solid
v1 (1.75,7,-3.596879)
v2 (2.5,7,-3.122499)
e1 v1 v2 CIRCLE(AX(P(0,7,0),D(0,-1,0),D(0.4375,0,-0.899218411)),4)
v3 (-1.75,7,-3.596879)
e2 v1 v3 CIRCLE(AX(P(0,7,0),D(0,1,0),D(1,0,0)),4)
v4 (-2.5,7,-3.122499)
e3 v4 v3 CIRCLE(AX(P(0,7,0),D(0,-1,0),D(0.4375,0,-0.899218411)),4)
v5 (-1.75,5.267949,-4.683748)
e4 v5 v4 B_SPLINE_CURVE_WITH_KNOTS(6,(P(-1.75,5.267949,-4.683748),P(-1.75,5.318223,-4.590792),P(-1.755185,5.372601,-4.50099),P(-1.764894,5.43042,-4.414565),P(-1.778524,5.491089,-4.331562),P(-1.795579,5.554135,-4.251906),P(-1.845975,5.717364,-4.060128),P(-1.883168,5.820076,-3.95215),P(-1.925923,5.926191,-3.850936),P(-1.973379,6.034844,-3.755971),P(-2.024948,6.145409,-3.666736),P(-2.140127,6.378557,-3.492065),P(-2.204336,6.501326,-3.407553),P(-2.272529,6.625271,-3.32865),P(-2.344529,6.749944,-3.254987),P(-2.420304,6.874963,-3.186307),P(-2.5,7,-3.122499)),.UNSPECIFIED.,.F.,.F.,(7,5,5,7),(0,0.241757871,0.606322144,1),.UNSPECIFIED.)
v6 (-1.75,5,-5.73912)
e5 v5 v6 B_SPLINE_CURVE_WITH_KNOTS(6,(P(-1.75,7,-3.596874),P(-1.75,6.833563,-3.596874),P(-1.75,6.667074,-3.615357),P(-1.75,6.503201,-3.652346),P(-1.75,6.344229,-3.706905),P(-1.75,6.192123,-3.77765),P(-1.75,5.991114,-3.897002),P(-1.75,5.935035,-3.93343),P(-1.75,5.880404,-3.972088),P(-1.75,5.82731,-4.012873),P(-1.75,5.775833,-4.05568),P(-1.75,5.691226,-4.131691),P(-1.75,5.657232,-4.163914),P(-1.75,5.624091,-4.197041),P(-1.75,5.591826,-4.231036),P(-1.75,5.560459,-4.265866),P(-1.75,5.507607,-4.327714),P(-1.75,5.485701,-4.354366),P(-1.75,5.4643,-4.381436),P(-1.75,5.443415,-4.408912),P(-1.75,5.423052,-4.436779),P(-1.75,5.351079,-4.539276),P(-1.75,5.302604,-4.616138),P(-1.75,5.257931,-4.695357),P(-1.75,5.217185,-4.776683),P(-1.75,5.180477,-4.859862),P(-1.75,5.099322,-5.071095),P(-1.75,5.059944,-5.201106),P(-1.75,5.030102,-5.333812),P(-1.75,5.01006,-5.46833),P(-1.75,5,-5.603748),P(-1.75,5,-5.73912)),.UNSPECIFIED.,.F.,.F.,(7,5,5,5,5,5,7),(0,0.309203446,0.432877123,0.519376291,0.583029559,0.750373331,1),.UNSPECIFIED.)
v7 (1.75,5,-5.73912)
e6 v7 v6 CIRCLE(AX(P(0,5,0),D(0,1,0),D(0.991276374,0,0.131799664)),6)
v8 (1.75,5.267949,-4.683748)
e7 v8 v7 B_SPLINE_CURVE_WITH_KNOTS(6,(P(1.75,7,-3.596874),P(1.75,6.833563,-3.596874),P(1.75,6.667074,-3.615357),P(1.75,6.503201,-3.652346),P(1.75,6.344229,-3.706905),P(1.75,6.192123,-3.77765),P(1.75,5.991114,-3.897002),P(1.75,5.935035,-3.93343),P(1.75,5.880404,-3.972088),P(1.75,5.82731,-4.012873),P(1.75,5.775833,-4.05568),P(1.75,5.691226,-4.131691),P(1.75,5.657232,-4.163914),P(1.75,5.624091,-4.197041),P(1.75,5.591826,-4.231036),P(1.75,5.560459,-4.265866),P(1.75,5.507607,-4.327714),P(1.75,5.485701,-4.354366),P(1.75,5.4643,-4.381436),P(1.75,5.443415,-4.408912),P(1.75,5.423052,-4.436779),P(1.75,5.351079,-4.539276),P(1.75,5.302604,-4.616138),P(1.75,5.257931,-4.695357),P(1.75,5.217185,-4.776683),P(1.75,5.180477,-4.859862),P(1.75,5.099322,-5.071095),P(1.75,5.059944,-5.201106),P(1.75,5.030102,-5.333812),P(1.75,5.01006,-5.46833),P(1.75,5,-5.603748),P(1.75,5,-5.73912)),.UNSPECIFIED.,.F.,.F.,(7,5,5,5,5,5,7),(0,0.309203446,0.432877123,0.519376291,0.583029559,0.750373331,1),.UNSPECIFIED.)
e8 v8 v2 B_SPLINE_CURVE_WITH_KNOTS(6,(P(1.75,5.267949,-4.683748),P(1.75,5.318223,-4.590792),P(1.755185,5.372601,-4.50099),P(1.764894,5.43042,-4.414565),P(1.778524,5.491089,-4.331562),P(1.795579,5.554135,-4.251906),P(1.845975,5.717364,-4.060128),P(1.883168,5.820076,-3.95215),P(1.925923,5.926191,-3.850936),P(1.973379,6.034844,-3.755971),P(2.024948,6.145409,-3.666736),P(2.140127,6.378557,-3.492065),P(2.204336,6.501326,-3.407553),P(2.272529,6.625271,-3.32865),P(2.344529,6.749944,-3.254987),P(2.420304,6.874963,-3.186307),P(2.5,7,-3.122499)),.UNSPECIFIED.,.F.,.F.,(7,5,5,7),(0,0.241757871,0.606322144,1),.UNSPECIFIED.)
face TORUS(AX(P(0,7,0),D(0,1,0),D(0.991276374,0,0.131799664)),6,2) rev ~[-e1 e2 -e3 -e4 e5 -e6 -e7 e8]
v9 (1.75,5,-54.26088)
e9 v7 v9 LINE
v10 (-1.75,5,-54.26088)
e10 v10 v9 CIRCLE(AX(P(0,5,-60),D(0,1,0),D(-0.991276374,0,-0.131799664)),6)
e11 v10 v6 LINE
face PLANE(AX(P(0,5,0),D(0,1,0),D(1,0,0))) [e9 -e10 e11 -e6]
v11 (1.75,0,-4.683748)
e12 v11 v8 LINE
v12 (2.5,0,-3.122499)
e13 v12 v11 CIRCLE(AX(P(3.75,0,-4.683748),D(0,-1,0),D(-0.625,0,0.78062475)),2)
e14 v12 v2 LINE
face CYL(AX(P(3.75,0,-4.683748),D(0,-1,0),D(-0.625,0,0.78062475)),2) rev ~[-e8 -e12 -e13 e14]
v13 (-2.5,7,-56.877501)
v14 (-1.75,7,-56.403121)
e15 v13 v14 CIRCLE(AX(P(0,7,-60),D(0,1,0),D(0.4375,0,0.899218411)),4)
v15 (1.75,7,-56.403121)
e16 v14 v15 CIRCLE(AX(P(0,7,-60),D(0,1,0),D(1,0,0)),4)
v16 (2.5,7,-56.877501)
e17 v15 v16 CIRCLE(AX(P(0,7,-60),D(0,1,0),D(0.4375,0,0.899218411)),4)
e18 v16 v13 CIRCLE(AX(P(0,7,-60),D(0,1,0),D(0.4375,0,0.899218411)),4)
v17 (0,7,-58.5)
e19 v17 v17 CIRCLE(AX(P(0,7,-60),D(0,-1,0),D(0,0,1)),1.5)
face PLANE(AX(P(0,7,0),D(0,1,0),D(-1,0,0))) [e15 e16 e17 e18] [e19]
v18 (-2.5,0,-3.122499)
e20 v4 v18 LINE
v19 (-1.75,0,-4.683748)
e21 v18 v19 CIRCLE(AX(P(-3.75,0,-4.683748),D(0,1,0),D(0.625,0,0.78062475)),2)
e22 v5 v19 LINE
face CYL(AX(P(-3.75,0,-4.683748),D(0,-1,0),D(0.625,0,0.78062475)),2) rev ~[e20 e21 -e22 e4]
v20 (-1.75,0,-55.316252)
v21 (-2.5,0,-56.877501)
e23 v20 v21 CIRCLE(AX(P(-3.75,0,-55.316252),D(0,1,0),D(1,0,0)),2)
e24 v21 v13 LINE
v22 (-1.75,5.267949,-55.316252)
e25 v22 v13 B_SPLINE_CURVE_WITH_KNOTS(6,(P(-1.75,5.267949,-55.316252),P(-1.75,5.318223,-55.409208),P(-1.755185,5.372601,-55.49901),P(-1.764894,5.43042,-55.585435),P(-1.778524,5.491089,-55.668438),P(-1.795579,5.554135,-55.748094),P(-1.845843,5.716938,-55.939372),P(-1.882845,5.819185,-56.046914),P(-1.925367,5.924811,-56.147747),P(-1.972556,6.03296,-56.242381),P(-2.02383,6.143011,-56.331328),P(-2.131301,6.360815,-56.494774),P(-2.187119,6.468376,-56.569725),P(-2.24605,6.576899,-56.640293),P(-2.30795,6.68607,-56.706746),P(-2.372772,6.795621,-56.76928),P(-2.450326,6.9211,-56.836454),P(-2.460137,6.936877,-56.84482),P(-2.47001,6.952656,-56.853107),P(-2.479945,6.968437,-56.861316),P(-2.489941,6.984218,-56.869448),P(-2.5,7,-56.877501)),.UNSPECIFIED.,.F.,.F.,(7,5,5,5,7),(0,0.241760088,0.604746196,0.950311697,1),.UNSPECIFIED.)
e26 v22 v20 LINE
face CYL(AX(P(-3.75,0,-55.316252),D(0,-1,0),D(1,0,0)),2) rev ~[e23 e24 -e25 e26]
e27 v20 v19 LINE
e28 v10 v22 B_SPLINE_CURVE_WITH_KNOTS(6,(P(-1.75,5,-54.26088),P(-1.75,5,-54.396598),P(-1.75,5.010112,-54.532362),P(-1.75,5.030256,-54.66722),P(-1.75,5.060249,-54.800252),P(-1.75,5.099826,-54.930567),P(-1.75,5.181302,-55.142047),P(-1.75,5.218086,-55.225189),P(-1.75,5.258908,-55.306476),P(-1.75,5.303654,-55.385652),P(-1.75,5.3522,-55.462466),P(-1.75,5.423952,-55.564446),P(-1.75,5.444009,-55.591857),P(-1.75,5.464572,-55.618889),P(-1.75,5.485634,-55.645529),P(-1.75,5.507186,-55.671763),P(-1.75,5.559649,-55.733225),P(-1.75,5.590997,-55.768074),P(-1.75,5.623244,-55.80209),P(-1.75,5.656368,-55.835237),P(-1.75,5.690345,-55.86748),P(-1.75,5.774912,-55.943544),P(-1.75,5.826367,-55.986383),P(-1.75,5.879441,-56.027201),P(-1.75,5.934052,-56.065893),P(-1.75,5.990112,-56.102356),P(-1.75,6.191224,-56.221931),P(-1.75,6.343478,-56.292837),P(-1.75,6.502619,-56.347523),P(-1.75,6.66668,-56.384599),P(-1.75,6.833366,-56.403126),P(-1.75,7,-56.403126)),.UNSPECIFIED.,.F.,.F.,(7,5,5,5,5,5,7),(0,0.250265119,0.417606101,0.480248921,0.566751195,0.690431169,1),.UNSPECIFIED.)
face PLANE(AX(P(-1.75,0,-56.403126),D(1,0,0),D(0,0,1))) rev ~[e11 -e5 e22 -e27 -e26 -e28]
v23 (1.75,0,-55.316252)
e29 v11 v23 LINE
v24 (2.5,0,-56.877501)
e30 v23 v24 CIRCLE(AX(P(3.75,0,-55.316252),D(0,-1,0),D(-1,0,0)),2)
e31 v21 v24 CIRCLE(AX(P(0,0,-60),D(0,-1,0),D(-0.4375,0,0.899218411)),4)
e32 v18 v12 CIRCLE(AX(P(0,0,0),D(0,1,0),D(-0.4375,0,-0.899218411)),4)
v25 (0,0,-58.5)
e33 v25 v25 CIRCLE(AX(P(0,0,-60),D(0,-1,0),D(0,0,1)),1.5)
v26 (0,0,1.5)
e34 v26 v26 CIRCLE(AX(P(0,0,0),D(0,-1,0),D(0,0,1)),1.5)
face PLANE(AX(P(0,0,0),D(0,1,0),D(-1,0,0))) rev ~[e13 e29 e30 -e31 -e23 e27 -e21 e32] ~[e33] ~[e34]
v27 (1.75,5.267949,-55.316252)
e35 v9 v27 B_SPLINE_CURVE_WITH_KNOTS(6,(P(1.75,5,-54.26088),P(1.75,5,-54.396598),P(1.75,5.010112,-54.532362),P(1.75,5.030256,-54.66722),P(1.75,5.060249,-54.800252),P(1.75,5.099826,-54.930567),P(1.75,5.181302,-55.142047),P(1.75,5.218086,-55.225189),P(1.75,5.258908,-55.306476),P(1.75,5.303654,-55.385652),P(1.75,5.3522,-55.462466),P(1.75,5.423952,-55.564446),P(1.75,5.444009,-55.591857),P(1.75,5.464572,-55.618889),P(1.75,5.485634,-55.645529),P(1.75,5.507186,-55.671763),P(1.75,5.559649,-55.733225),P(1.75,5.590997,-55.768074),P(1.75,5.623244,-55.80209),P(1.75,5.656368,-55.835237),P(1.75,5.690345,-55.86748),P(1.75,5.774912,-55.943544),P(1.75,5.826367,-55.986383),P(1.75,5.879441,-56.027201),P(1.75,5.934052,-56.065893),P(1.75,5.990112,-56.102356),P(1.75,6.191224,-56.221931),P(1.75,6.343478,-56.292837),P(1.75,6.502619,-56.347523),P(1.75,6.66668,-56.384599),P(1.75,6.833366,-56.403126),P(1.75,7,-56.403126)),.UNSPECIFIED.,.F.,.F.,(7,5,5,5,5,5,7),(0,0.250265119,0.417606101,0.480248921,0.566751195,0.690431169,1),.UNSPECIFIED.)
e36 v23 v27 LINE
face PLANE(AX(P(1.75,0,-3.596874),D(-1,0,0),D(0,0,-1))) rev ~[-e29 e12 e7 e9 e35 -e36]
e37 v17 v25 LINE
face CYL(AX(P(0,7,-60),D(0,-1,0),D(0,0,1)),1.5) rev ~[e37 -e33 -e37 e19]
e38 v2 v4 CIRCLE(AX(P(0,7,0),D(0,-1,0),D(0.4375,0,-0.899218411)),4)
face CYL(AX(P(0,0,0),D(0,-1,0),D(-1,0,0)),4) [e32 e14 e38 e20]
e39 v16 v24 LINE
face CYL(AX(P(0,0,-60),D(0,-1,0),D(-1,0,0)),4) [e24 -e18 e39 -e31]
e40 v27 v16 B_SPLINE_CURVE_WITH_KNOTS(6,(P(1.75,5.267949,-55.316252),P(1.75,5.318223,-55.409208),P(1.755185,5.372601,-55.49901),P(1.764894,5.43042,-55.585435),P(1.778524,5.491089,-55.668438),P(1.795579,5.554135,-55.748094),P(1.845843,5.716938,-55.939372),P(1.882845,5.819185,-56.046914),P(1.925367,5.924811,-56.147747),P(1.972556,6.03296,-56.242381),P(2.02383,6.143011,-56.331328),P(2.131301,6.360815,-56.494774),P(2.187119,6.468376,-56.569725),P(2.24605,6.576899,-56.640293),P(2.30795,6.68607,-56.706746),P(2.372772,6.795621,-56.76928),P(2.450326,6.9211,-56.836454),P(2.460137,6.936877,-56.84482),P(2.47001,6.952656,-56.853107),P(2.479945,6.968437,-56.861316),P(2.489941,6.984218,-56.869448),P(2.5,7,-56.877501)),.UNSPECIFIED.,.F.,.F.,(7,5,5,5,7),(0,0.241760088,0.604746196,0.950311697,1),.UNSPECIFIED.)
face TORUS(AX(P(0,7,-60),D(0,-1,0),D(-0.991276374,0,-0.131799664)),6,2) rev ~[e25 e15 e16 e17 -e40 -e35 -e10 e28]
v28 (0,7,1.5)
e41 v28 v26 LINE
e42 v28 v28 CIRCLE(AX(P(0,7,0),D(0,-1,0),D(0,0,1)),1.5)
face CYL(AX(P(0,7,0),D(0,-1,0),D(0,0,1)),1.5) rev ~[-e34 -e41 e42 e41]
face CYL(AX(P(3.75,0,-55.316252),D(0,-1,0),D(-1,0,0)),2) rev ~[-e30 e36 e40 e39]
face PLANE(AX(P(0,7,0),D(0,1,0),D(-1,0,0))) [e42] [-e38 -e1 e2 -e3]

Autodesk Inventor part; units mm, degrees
ref_plane "YZ Plane" through (0, 0, 0) normal (1, 0, 0) x (0, 1, 0)
ref_plane "XZ Plane" through (0, 0, 0) normal (0, 1, 0) x (-1, 0, 0)
ref_plane "XY Plane" through (0, 0, 0) normal (0, 0, 1) x (1, 0, 0)
sketch "Sketch1" plane through (0, 0, 0) normal (0, 1, 0) x (-1, 0, 0)
  circle A0 centre (0, 0) radius 4
  line L0 (0, 0) -> (0, -60)
  circle A1 centre (0, -60) radius 4
  line L1 (0, 0) -> (0, -60) construction
  line L2 (-1.75, 0) -> (-1.75, -60)
  line L3 (1.75, -60) -> (1.75, 0)
  arc A2 (1.75, 0) -> (-1.75, 0) centre (0, 0) ccw
  arc A3 (-1.75, -60) -> (1.75, -60) centre (0, -60) ccw
  point P0 (0, -30)
  point P1 (-1.75, -3.5969)
  point P2 (-1.75, -56.4031)
  point P3 (1.75, -56.4031)
  point P4 (1.75, -3.5969)
  dimension "d0" = 8
  dimension "d1" = 60
  dimension "d2" = 8
  dimension "d3" = 3.5
extrude "Extrusion1" add sketch "Sketch1" along normal blind 7
sketch "Sketch2" plane through (0, 7, 0) normal (0, 1, 0) x (1, 0, 0)
  line L0 (1.75, 3.5969) -> (1.75, 56.4031) projected
  arc A0 (1.75, 56.4031) -> (-1.75, 56.4031) centre (0, 60) ccw projected
  line L1 (-1.75, 56.4031) -> (-1.75, 3.5969) projected
  arc A1 (-1.75, 3.5969) -> (1.75, 3.5969) centre (0, 0) ccw projected
  circle A2 centre (0, 0) radius 4
  circle A3 centre (0, 60) radius 4
  point P0 (-1.75, 56.4031)
  point P1 (-1.75, 3.5969)
  dimension "d6" = 8
  dimension "d7" = 8
extrude "Extrusion2" cut sketch "Sketch2" against normal blind 2 contours A2 L1 A3 L0
sketch "Sketch3" plane through (0, 7, 0) normal (0, 1, 0) x (1, 0, 0)
  circle A0 centre (0, 0) radius 4 projected
  circle A1 centre (0, 60) radius 4 projected
hole "Hole1" at (0, 7, 0) at (0, 7, -60) direction (0, -1, 0) diameter 3 depth 8
fillet "Fillet1" radius 2 6 edges at (1.75, 2.5, -56.4031) (0, 5, -56) (-1.75, 2.5, -56.4031) (-1.75, 2.5, -3.5969) (0, 5, -4) (1.75, 2.5, -3.5969)
properties part number "leg_link_3_m"
